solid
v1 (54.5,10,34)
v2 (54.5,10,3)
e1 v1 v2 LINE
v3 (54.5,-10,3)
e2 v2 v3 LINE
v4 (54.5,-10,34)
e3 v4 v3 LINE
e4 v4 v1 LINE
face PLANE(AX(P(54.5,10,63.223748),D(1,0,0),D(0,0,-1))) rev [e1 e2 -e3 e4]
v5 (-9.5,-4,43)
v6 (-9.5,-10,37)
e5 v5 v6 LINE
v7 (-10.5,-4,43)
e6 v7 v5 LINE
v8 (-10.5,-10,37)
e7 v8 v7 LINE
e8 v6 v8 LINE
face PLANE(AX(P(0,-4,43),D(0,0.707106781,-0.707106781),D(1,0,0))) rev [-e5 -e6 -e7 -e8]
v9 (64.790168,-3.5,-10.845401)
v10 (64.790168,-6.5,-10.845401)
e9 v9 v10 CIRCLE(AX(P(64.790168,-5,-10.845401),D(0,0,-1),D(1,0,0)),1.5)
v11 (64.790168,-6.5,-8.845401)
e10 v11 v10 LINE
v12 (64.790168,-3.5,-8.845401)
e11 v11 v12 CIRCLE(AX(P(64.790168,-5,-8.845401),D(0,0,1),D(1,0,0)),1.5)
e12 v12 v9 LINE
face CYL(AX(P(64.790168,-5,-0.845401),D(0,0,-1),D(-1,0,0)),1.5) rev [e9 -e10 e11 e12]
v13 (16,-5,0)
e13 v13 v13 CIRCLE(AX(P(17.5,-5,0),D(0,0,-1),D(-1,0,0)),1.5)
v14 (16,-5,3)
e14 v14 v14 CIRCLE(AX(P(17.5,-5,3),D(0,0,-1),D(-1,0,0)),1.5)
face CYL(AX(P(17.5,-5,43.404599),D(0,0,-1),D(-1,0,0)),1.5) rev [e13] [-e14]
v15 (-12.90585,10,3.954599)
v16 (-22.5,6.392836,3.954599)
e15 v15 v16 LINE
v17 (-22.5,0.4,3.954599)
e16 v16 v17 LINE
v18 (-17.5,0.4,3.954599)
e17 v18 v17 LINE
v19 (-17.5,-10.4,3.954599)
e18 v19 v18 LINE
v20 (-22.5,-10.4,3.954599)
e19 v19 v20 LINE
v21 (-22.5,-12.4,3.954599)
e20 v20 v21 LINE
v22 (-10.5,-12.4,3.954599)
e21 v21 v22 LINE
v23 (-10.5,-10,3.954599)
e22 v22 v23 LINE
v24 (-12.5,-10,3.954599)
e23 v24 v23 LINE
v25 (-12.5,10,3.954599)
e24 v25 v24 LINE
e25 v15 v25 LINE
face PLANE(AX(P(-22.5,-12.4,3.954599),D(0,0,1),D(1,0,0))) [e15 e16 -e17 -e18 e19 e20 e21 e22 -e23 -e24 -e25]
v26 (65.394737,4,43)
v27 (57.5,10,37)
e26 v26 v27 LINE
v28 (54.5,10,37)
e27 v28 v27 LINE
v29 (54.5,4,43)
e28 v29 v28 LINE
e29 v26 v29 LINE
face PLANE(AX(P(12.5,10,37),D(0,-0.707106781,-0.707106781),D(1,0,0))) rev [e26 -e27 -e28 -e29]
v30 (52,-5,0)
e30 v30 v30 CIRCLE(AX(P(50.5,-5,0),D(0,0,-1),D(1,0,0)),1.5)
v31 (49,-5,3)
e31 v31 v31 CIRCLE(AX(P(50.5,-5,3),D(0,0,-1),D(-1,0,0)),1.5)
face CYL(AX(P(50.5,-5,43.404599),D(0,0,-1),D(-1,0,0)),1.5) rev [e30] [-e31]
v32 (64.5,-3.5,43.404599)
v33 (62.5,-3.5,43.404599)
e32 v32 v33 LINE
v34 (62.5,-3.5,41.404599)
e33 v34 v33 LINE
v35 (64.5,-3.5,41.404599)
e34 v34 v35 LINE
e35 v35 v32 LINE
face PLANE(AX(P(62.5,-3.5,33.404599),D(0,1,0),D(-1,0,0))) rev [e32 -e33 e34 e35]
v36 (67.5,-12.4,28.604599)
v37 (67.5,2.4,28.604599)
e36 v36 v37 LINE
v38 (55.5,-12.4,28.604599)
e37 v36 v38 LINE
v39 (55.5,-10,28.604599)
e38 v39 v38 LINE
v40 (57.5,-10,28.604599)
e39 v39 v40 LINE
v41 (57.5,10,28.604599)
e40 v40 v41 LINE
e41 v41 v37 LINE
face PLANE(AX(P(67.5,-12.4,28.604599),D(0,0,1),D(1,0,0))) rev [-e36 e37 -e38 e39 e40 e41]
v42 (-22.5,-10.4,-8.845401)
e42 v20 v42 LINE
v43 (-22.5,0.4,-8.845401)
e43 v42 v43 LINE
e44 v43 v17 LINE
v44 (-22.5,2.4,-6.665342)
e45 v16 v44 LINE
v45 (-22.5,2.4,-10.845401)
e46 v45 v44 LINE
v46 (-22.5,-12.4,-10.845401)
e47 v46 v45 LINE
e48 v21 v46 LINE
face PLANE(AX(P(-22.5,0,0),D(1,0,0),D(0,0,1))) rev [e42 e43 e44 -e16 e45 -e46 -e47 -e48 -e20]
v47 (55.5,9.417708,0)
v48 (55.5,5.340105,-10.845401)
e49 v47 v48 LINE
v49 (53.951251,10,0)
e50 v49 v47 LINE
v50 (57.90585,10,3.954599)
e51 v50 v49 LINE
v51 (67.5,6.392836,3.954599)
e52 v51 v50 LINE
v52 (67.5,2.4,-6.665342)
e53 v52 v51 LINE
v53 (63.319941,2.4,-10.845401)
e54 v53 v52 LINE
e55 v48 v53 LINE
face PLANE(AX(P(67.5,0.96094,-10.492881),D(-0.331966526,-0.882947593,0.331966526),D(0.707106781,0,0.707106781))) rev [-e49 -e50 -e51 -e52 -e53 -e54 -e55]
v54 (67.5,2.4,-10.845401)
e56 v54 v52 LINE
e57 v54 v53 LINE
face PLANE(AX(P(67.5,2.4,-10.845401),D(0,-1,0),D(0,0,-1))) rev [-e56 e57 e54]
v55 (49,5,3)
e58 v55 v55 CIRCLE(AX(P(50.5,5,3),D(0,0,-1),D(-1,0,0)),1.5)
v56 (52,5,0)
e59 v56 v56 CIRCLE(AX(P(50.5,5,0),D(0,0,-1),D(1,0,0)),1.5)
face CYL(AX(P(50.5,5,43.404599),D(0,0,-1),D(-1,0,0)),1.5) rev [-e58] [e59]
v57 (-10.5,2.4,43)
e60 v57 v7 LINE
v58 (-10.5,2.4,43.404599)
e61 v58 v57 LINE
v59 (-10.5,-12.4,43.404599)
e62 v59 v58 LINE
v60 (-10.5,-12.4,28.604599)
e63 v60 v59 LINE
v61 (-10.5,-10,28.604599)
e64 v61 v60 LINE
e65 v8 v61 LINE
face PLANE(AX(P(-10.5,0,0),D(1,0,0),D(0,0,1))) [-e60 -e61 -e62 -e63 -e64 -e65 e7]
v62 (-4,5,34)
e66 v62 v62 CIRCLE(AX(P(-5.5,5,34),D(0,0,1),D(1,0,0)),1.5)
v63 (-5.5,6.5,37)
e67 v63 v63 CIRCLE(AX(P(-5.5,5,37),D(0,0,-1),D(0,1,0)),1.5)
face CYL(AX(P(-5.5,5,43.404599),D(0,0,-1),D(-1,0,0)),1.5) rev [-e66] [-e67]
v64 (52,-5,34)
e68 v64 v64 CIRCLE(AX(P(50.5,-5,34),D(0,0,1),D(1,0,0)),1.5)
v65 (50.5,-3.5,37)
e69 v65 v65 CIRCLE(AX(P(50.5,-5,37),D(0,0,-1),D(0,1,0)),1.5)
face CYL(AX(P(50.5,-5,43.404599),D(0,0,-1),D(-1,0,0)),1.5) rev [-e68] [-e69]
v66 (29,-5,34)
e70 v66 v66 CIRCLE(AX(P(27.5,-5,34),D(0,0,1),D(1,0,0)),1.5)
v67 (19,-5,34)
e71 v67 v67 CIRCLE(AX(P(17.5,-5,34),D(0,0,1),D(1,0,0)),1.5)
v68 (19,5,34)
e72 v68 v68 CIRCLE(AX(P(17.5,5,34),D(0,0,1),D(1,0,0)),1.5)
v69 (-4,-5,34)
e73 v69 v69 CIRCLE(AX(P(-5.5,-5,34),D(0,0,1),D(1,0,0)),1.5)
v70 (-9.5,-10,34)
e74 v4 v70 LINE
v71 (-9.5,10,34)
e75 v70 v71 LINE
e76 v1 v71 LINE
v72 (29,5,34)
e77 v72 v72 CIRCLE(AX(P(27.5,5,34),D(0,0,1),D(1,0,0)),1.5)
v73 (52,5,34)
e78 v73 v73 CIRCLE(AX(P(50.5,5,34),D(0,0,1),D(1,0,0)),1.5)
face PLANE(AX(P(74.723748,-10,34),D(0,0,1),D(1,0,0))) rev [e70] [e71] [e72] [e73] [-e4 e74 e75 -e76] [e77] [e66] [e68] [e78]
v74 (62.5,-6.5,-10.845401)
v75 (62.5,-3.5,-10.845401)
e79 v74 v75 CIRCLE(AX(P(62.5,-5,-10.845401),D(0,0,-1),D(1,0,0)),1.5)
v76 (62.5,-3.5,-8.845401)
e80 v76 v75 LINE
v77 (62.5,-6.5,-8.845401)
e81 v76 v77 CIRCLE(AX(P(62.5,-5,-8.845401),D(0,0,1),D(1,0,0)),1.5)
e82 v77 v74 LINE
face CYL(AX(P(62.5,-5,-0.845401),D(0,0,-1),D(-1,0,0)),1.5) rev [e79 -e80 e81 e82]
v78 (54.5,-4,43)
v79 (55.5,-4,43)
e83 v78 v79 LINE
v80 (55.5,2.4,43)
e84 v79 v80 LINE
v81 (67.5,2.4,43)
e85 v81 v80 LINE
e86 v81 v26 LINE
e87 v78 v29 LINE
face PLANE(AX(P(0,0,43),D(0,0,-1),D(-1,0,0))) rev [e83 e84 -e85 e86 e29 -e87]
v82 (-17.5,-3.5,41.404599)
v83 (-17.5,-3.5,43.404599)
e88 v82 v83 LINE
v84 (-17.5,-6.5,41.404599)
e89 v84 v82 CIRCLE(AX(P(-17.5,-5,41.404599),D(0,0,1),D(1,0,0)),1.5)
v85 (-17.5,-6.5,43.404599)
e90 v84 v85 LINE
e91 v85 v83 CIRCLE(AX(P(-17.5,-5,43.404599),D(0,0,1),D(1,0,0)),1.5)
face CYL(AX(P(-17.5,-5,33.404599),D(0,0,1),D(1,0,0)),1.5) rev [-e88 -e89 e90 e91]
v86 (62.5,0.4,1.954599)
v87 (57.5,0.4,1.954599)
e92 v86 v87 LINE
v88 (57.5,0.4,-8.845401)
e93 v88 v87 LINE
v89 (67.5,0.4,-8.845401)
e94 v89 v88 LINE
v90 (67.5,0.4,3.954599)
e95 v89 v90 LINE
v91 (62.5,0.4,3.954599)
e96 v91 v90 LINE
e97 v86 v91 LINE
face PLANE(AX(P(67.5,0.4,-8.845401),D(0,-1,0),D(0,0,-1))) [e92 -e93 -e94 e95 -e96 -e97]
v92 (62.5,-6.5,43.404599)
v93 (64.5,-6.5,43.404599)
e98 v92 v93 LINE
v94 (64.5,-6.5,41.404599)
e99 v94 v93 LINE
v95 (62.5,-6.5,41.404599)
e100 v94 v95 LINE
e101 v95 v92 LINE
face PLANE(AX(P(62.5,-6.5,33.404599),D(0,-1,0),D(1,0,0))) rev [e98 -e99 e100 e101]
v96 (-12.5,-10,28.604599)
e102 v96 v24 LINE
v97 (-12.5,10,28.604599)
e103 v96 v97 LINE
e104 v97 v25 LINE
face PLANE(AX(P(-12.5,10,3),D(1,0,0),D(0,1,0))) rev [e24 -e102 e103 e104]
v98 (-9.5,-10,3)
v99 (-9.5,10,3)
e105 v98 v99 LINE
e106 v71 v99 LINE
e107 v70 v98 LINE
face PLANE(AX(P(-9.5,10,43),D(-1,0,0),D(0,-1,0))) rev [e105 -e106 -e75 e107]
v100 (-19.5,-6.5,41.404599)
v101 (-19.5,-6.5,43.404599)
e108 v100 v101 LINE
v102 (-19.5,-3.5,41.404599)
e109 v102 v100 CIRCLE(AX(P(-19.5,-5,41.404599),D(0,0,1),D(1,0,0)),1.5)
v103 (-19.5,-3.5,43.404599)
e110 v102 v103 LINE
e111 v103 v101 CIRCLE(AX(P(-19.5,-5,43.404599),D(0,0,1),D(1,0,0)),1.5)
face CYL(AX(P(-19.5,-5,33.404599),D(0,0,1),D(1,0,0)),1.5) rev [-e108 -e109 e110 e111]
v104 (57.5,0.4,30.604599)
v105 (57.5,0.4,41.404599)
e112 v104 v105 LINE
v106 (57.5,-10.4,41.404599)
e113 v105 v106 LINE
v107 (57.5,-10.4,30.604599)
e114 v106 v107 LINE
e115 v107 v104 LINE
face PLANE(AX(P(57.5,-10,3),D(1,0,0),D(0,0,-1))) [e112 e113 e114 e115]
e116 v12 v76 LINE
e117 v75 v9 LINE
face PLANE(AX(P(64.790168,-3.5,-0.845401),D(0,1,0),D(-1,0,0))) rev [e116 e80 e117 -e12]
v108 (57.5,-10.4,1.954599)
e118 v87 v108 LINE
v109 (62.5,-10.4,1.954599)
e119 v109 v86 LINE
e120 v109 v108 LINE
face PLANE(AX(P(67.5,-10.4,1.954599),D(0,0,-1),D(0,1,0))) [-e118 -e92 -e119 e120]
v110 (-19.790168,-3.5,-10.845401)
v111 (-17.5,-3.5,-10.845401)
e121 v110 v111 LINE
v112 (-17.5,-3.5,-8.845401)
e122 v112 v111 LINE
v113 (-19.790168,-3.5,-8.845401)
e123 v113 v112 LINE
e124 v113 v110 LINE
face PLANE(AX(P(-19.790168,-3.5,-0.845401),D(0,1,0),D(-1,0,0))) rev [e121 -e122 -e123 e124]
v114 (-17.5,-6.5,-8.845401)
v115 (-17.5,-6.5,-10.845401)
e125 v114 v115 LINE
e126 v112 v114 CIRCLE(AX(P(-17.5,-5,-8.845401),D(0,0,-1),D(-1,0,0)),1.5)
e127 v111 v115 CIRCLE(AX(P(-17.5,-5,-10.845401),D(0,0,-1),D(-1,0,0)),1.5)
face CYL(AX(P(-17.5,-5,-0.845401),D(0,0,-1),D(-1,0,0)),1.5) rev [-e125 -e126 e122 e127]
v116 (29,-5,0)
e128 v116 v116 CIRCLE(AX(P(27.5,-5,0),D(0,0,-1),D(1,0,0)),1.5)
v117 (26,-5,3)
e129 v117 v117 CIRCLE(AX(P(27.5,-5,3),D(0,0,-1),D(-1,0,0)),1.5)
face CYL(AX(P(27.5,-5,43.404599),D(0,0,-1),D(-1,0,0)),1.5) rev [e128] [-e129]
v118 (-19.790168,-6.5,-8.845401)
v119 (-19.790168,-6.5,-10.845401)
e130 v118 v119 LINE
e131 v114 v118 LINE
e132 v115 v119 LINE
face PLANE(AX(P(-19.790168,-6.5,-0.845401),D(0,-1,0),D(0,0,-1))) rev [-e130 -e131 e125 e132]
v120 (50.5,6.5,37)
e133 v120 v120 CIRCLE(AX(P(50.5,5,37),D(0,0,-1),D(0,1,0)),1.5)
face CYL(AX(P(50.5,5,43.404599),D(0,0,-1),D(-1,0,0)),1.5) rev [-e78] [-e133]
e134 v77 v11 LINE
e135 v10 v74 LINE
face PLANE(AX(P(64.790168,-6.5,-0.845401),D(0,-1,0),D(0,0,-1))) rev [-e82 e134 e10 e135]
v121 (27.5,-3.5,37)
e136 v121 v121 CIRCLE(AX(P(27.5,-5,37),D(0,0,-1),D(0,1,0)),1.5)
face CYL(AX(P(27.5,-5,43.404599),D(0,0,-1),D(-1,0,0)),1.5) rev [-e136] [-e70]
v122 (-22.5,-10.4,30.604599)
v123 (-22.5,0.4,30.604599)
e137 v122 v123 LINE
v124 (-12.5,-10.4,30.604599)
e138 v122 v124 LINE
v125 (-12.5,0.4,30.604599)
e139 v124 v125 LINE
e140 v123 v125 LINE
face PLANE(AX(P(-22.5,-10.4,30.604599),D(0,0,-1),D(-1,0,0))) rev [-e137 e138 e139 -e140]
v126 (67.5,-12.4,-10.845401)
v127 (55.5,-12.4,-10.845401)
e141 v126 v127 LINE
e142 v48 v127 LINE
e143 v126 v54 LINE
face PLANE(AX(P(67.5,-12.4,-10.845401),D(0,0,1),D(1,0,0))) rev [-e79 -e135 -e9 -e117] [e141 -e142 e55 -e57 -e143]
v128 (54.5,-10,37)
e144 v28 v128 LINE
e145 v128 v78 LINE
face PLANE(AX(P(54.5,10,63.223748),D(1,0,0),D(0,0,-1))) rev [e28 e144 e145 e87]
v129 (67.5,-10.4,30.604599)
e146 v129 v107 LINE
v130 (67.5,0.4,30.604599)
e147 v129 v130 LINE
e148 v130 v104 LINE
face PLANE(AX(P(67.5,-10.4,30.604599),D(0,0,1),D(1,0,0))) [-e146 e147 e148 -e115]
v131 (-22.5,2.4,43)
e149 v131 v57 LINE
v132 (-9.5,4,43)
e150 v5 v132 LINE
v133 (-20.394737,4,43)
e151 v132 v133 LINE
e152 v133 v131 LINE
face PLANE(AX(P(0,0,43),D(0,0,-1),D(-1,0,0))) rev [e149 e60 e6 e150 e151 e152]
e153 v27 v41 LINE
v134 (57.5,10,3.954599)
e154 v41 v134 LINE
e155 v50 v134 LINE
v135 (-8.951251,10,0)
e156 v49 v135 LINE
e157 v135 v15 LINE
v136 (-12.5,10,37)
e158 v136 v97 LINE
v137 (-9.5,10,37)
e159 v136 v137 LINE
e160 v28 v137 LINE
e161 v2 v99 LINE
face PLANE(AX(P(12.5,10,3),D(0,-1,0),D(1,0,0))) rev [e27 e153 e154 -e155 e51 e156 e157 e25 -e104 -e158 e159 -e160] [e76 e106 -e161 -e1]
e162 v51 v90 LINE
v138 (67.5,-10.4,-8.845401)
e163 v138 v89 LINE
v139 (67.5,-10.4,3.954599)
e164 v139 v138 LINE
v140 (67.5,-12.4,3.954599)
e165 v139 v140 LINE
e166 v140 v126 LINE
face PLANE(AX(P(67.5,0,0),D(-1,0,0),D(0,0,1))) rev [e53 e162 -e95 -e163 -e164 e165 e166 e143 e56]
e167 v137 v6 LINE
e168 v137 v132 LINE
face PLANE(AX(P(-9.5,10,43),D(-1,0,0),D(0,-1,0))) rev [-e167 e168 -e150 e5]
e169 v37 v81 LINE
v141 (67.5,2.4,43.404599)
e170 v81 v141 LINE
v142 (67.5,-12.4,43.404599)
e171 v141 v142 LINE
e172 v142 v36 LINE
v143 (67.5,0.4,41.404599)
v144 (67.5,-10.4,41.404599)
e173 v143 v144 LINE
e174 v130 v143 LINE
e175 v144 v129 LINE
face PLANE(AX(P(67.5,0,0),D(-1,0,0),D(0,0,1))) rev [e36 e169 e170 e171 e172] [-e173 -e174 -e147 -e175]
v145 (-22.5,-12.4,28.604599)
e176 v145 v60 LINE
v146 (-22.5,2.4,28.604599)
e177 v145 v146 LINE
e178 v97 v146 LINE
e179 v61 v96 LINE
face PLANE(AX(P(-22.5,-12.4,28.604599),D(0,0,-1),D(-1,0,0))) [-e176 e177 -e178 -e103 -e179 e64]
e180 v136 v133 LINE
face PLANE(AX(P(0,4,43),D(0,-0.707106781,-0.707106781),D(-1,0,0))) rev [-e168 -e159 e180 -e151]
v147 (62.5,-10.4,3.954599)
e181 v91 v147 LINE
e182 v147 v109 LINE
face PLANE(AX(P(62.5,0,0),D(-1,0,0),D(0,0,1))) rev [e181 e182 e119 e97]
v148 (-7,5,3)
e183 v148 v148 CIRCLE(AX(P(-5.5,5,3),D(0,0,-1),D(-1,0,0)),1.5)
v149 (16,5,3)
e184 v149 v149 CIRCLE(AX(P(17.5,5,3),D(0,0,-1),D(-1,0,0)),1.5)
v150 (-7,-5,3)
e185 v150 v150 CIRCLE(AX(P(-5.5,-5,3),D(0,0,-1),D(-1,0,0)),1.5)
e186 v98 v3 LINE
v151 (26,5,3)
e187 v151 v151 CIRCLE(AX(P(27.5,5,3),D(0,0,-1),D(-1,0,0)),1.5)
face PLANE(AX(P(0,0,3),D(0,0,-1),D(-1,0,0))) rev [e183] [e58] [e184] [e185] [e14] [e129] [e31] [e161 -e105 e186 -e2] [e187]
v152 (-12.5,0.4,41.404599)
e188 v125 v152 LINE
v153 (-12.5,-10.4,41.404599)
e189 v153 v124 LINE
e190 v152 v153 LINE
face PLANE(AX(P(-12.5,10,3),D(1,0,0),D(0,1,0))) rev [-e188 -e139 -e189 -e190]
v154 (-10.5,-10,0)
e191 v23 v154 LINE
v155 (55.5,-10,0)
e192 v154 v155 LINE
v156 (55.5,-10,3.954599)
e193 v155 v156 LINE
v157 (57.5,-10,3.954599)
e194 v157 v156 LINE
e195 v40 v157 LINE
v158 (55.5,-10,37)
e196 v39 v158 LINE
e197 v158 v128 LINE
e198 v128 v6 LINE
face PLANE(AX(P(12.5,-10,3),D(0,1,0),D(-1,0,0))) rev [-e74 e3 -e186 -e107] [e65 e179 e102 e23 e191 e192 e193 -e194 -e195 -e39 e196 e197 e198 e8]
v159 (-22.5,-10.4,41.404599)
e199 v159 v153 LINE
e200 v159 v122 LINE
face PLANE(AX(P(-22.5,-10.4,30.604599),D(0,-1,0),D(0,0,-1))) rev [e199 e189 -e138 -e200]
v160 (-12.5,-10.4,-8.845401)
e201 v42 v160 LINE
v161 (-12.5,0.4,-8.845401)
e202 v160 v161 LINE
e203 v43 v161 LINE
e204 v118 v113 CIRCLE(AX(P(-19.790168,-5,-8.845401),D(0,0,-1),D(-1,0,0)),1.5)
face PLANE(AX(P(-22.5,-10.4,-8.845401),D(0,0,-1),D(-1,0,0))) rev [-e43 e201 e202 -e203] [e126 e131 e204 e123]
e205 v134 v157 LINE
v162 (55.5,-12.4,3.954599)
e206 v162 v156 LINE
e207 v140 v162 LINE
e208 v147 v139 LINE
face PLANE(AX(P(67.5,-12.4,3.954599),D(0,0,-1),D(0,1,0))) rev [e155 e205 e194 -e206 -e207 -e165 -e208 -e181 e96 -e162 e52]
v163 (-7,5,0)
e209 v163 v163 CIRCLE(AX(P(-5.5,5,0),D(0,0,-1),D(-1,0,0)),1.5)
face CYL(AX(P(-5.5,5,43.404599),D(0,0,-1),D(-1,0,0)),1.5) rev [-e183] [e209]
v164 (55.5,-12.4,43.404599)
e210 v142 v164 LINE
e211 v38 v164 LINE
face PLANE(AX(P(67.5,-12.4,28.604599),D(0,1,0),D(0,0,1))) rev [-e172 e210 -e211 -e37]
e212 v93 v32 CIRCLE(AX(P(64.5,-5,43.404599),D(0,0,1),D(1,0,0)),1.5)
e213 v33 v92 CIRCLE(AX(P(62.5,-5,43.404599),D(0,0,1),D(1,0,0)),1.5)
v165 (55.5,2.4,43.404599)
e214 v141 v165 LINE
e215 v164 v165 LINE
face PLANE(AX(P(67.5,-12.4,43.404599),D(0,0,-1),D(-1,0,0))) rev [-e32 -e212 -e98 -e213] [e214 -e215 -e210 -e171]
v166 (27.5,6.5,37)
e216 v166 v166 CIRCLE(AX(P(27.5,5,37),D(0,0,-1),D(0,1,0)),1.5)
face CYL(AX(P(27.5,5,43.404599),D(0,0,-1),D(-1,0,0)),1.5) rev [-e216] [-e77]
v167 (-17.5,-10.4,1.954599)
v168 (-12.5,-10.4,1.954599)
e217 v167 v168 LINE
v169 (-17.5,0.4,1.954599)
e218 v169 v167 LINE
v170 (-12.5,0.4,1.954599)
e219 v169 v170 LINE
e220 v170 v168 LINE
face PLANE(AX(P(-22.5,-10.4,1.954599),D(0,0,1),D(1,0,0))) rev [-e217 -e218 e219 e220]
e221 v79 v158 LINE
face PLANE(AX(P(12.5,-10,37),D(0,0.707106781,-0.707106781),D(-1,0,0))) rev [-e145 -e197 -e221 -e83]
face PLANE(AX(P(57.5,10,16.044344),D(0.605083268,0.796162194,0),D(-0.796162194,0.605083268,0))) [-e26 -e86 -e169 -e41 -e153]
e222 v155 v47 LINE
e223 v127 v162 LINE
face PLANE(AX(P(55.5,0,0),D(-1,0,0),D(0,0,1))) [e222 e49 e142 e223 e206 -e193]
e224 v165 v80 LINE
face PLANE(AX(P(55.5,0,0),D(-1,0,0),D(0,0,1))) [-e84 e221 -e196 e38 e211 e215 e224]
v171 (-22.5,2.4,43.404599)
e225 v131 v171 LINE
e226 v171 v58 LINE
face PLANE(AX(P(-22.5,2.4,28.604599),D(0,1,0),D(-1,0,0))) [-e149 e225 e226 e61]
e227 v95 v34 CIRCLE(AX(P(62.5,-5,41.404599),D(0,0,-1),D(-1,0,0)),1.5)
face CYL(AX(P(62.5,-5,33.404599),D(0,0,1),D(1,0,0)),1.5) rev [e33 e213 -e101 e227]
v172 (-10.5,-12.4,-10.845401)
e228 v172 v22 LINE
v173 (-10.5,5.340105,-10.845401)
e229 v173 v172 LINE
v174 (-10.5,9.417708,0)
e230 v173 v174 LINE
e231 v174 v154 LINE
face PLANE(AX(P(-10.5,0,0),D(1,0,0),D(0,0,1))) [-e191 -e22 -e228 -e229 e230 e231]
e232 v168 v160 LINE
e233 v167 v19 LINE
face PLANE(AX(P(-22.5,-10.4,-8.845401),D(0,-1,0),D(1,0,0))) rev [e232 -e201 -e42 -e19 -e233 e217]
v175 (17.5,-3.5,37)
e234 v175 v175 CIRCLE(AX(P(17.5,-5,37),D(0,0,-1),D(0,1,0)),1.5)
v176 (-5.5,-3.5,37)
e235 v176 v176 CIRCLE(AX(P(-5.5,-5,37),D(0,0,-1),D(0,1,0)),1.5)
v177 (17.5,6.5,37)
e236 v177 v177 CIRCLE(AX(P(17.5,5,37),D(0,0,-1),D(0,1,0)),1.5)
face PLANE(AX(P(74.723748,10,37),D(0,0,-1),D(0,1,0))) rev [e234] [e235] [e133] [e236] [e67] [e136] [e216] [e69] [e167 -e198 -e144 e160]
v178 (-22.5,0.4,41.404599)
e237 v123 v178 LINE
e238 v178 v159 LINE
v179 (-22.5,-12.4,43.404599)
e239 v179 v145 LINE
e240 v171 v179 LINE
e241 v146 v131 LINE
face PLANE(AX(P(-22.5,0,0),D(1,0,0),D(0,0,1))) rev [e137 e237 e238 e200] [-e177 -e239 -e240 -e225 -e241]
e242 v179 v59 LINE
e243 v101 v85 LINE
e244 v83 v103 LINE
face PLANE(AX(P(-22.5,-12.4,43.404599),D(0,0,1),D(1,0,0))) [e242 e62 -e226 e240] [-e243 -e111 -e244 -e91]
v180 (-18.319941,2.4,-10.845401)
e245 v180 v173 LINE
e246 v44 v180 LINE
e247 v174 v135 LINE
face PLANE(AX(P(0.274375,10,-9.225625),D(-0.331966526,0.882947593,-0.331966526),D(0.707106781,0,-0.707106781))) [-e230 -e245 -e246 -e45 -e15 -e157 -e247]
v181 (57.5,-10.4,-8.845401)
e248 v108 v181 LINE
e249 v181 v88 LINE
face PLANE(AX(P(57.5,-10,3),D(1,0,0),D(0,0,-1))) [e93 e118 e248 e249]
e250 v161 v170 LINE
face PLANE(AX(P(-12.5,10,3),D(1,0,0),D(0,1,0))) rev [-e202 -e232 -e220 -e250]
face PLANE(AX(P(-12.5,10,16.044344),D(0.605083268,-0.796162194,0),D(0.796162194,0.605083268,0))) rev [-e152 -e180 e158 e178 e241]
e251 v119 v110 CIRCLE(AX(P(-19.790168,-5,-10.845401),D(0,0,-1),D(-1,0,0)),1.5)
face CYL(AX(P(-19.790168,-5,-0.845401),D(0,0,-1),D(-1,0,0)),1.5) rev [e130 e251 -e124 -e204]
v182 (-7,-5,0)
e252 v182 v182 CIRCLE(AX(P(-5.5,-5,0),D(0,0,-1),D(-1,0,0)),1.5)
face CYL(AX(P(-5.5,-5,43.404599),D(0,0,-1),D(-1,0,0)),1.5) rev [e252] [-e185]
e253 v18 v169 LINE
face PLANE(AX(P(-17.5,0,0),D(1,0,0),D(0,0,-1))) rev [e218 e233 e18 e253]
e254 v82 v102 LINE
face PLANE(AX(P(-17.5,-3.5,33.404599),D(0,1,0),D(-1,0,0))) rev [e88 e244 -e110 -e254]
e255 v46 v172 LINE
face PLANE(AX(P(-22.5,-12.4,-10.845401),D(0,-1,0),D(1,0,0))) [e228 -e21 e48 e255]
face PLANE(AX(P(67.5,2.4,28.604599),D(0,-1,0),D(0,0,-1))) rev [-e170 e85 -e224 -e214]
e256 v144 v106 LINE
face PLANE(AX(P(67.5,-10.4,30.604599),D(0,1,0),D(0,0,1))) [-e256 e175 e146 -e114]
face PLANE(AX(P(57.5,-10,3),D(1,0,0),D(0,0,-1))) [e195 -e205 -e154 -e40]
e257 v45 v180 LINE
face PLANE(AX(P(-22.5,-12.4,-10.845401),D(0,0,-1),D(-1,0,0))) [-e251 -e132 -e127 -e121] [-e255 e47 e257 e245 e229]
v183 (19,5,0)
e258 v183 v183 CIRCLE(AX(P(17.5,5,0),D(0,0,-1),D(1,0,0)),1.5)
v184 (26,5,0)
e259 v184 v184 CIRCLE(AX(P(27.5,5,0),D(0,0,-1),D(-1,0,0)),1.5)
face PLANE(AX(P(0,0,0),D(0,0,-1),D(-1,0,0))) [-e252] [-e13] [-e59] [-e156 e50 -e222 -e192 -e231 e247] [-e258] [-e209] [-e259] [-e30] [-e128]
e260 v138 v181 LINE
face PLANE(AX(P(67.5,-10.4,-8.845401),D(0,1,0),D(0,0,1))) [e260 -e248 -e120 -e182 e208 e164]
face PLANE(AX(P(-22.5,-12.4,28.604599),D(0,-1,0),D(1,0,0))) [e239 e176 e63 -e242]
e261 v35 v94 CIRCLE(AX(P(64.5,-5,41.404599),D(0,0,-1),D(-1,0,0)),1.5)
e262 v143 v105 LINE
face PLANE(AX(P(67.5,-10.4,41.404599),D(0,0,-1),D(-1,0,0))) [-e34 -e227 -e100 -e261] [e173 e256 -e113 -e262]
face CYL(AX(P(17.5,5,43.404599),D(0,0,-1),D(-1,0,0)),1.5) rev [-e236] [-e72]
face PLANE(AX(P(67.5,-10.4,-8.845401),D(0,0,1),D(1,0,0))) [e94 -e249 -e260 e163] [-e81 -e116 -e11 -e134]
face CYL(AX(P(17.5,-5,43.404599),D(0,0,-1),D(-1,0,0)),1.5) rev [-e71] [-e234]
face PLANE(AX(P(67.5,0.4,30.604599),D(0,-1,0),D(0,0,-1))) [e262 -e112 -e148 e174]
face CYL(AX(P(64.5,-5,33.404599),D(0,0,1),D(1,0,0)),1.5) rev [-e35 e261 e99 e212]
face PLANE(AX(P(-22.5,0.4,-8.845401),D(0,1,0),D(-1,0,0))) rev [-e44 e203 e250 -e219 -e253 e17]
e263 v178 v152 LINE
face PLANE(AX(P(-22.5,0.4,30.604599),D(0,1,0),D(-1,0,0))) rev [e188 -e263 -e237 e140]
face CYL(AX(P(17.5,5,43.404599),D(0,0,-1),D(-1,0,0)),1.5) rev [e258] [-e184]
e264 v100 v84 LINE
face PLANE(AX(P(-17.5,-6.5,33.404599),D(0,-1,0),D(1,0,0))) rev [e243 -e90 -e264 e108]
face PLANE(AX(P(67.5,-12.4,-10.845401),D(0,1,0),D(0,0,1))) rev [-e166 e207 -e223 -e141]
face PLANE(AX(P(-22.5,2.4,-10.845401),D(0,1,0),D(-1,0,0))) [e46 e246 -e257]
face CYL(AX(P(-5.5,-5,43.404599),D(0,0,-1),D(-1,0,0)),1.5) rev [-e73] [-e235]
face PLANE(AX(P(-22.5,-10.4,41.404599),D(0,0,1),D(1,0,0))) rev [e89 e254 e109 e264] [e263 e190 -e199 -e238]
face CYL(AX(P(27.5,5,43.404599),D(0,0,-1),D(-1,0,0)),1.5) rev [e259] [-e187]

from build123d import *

# Parameters (mm, degrees)
SKETCH1_W            = 25
SKETCH1_H            = 20
BOSS_EXTRUDE1_DEPTH  = 3
SKETCH2_W            = 3
SKETCH2_H            = 20
BOSS_EXTRUDE2_DEPTH  = 40
SKETCH6_W            = 45
SKETCH6_H            = 20
BOSS_EXTRUDE3_DEPTH  = 3
SKETCH9_W            = 3
SKETCH9_H            = 20
BOSS_EXTRUDE4_DEPTH  = 40
CHAMFER1_SIZE        = 6
SKETCH17_W           = 14.8
SKETCH17_H           = 14.8
SKETCH17_W_2         = 10.8
SKETCH17_H_2         = 10.8
BOSS_EXTRUDE7_DEPTH  = 10
SKETCH18_W           = 14.8
SKETCH18_H           = 14.8
BOSS_EXTRUDE8_DEPTH  = 2
SKETCH21_W           = 14.8
SKETCH21_H           = 14.8
BOSS_EXTRUDE11_DEPTH = 2
BOSS_EXTRUDE12_REACH = 89.482
BOSS_EXTRUDE13_DEPTH = 7.6
CHAMFER4_SIZE        = 17
CHAMFER4_SIZE_2      = 9.039060338
CUT_EXTRUDE8_DEPTH   = 13
SKETCH27_W           = 2
SKETCH27_H           = 10.8
CUT_EXTRUDE10_DEPTH  = 3
CUT_EXTRUDE12_DEPTH  = 10
CUT_EXTRUDE13_START  = -10
CUT_EXTRUDE13_DEPTH  = 10
SKETCH40_W           = 2
SKETCH40_H           = 10.8
CUT_EXTRUDE16_DEPTH  = 2
SKETCH41_W           = 2
SKETCH41_H           = 10.8
CUT_EXTRUDE17_DEPTH  = 2
SKETCH51_W           = 3
SKETCH51_H           = 20
BOSS_EXTRUDE14_DEPTH = 64
SKETCH50_R           = 1.5
CUT_EXTRUDE22_DEPTH  = 82.203258526


# Read off the part's stored shape, not the designer's step: Mirror3
with BuildPart() as part:
    # Sketch1 → Boss-Extrude1 (new body)
    with BuildSketch(Plane.XY):
        Rectangle(SKETCH1_W, SKETCH1_H)
    extrude(amount=BOSS_EXTRUDE1_DEPTH)

    # Sketch2 → Boss-Extrude2 (add)
    with BuildSketch(Plane.XY.offset(3)):
        with Locations((-11, 0)):
            Rectangle(SKETCH2_W, SKETCH2_H)
    extrude(amount=BOSS_EXTRUDE2_DEPTH)

    # Sketch6 → Boss-Extrude3 (add)
    with BuildSketch(Plane(origin=(0, 0, 0), x_dir=(-1, 0, 0), z_dir=(0, 0, -1))):
        with Locations((-35, 0)):
            Rectangle(SKETCH6_W, SKETCH6_H)
    extrude(amount=-BOSS_EXTRUDE3_DEPTH)

    # Sketch9 → Boss-Extrude4 (add)
    with BuildSketch(Plane.XY.offset(3)):
        with Locations((56, 0)):
            Rectangle(SKETCH9_W, SKETCH9_H)
    extrude(amount=BOSS_EXTRUDE4_DEPTH)

    # Chamfer1
    chamfer1_edges = [part.edges().sort_by_distance(p)[0] for p in [
        (-11, -10, 43),
        (-11, 10, 43),
        (56, -10, 43),
        (56, 10, 43),
    ]]
    chamfer(chamfer1_edges, length=CHAMFER1_SIZE)

    # Sketch17 → Boss-Extrude7 (add)
    # profile 1 of 2: a face of its own
    with BuildSketch(Plane(origin=(57.5, 0, 0), x_dir=(0, 0, -1), z_dir=(1, 0, 0))):
        with Locations((3.445401219, -5)):
            Rectangle(SKETCH17_W, SKETCH17_H)
        with Locations((3.445401219, -5)):
            Rectangle(SKETCH17_W_2, SKETCH17_H_2, mode=Mode.SUBTRACT)
    # profile 2 of 2: a face of its own
    with BuildSketch(Plane(origin=(57.5, 0, 0), x_dir=(0, 0, -1), z_dir=(1, 0, 0))):
        with Locations((-36.004598781, -5)):
            Rectangle(SKETCH17_W, SKETCH17_H)
        with Locations((-36.004598781, -5)):
            Rectangle(SKETCH17_W_2, SKETCH17_H_2, mode=Mode.SUBTRACT)
    extrude(amount=BOSS_EXTRUDE7_DEPTH)

    # Sketch18 → Boss-Extrude8 (add)
    with BuildSketch(Plane.ZY.offset(-57.5)):
        with Locations((-3.445401219, -5)):
            Rectangle(SKETCH18_W, SKETCH18_H)
    extrude(amount=BOSS_EXTRUDE8_DEPTH)

    # Sketch21 → Boss-Extrude11 (add)
    with BuildSketch(Plane.ZY.offset(-57.5)):
        with Locations((36.004598781, -5)):
            Rectangle(SKETCH21_W, SKETCH21_H)
    extrude(amount=BOSS_EXTRUDE11_DEPTH)

    # Boss-Extrude12: up to this face of the body (flat: up to its plane)
    boss_extrude12_end = Plane(part.part.faces().sort_by_distance((62.311518325, -5.194764398, 28.604598781))[0])
    # Sketch22 → Boss-Extrude12 (add, up to the picked face)
    with BuildSketch(Plane.XY.offset(43.404598781), mode=Mode.PRIVATE) as boss_extrude12_sk1:
        Polygon((57.5, 2.4), (57.5, 10), (67.5, 2.4), align=None)
    boss_extrude12_tool1 = split(extrude(boss_extrude12_sk1.sketch, amount=-BOSS_EXTRUDE12_REACH, mode=Mode.PRIVATE), bisect_by=boss_extrude12_end, keep=Keep.BOTH, mode=Mode.PRIVATE)
    add(boss_extrude12_tool1.solids().sort_by(Axis((60.833333, 4.933333, 43.404599), (0, 0, -1)))[0])

    # Sketch23 → Boss-Extrude13 (add)
    with BuildSketch(Plane(origin=(0, 2.4, 0), x_dir=(1, 0, 0), z_dir=(0, 1, 0))):
        Polygon((55.5, 0), (57.5, 0), (57.5, -3.954598781), (67.5, -3.954598781), (67.5, 10.492881323), (67.147480104, 10.845401219), (55.5, 10.845401219), align=None)
    extrude(amount=BOSS_EXTRUDE13_DEPTH)

    # Chamfer4
    # the kernel refuses this chamfer: 17, 9.039060338 mm, written as the material it adds along each edge
    # the kernel refuses this chamfer: 17, 9.039060338 mm, written as the material it takes off along each edge
    with BuildSketch(Plane(origin=(98.618530871, 10, 20.625649548), x_dir=(-0.7069904920950609, 0.018135274312576832, 0.706990492095043), z_dir=(-0.7071067811865386, 0, -0.7071067811865565))) as chamfer4_2_piece_1_section:
        Polygon((CHAMFER4_SIZE * 0.99983554239, -CHAMFER4_SIZE * 0.0181352743126), (-CHAMFER4_SIZE_2 * 0.0181352743131, -CHAMFER4_SIZE_2 * 0.999835542417), (0, 0), align=None)
    chamfer4_2_piece_1 = extrude(amount=88.515035216, mode=Mode.PRIVATE)
    chamfer4_2_piece_1 = split(chamfer4_2_piece_1, bisect_by=Plane(origin=(63.588119048, 2.4, 1.757393484), z_dir=(0, 1, 0)), keep=Keep.TOP, mode=Mode.PRIVATE)
    add(chamfer4_2_piece_1, mode=Mode.SUBTRACT)

    # Sketch24 → Cut-Extrude8 (cut)
    with BuildSketch(Plane.ZY.offset(-57.5)):
        Polygon((37, 10), (43.404598781, 10), (43.404598781, 2.4), (43, 2.4), (43, 4), align=None)
    extrude(amount=-CUT_EXTRUDE8_DEPTH, mode=Mode.SUBTRACT)

    # Mirror3
    split(bisect_by=Plane.ZY.offset(-22.5), keep=Keep.BOTTOM)

    # Mirror3 2: part across plane


with BuildPart() as part_1:
    add(part.part)
    add(part.part.mirror(Plane.ZY.offset(-22.5)))

    # Sketch27 → Cut-Extrude10 (cut)
    with BuildSketch(Plane.ZY.offset(22.5)):
        with Locations((2.954598781, -5)):
            Rectangle(SKETCH27_W, SKETCH27_H)
    cut_extrude10 = extrude(amount=-CUT_EXTRUDE10_DEPTH, mode=Mode.SUBTRACT)

    # Mirror4: Cut-Extrude10 across plane
    add(cut_extrude10.mirror(Plane.ZY.offset(-22.5)), mode=Mode.SUBTRACT)

    # Sketch32 → Cut-Extrude12 (cut)
    with BuildSketch(Plane(origin=(0, 0, -10.845401219), x_dir=(-1, 0, 0), z_dir=(0, 0, -1))):
        with BuildLine():
            Line((19.790168373, -6.5), (17.5, -6.5))
            ThreePointArc((17.5, -6.5), (16, -5), (17.5, -3.5))
            Line((17.5, -3.5), (19.790168373, -3.5))
            ThreePointArc((19.790168373, -3.5), (21.290168373, -5), (19.790168373, -6.5))
        make_face()
        with BuildLine():
            Line((-64.790168373, -6.5), (-62.5, -6.5))
            ThreePointArc((-62.5, -6.5), (-61, -5), (-62.5, -3.5))
            Line((-62.5, -3.5), (-64.790168373, -3.5))
            ThreePointArc((-64.790168373, -3.5), (-66.290168373, -5), (-64.790168373, -6.5))
        make_face()
    extrude(amount=-CUT_EXTRUDE12_DEPTH, mode=Mode.SUBTRACT)

    # Sketch33 → Cut-Extrude13 (cut)
    with BuildSketch(Plane.XY.offset(43.404598781).offset(CUT_EXTRUDE13_START)):
        with BuildLine():
            Line((62.5, -3.5), (64.5, -3.5))
            ThreePointArc((64.5, -3.5), (66, -5), (64.5, -6.5))
            Line((64.5, -6.5), (62.5, -6.5))
            ThreePointArc((62.5, -6.5), (61, -5), (62.5, -3.5))
        make_face()
        with BuildLine():
            Line((-17.5, -6.5), (-19.5, -6.5))
            ThreePointArc((-19.5, -6.5), (-21, -5), (-19.5, -3.5))
            Line((-19.5, -3.5), (-17.5, -3.5))
            ThreePointArc((-17.5, -3.5), (-16, -5), (-17.5, -6.5))
        make_face()
    extrude(amount=CUT_EXTRUDE13_DEPTH, mode=Mode.SUBTRACT)

    # Sketch40 → Cut-Extrude16 (cut)
    with BuildSketch(Plane(origin=(64.5, 0, 0), x_dir=(0, 0, -1), z_dir=(1, 0, 0))):
        with Locations((-2.954598781, -5)):
            Rectangle(SKETCH40_W, SKETCH40_H)
    extrude(amount=-CUT_EXTRUDE16_DEPTH, mode=Mode.SUBTRACT)

    # Sketch41 → Cut-Extrude17 (cut)
    with BuildSketch(Plane.ZY.offset(19.5)):
        with Locations((2.954598781, -5)):
            Rectangle(SKETCH41_W, SKETCH41_H)
    extrude(amount=-CUT_EXTRUDE17_DEPTH, mode=Mode.SUBTRACT)

    # Sketch51 → Boss-Extrude14 (add)
    with BuildSketch(Plane(origin=(-9.5, 0, 0), x_dir=(0, 0, -1), z_dir=(1, 0, 0))):
        with Locations((-35.5, 0)):
            Rectangle(SKETCH51_W, SKETCH51_H)
    extrude(amount=BOSS_EXTRUDE14_DEPTH)

    # Sketch50 → Cut-Extrude22 (cut, through all)
    with BuildSketch(Plane(origin=(0, 0, 0), x_dir=(-1, 0, 0), z_dir=(0, 0, -1))):
        with Locations(Location((5.5, 5, 0), (0, 0, 90))):
            Circle(SKETCH50_R)
        with Locations(Location((5.5, -5, 0), (0, 0, 90))):
            Circle(SKETCH50_R)
        with Locations(Location((-50.5, -5, 0), (0, 0, 90))):
            Circle(SKETCH50_R)
        with Locations(Location((-50.5, 5, 0), (0, 0, 90))):
            Circle(SKETCH50_R)
        with Locations(Location((-27.5, 5, 0), (0, 0, 90))):
            Circle(SKETCH50_R)
        with Locations(Location((-27.5, -5, 0), (0, 0, 90))):
            Circle(SKETCH50_R)
        with Locations(Location((-17.5, -5, 0), (0, 0, 90))):
            Circle(SKETCH50_R)
        with Locations(Location((-17.5, 5, 0), (0, 0, 90))):
            Circle(SKETCH50_R)
    extrude(amount=-CUT_EXTRUDE22_DEPTH, mode=Mode.SUBTRACT)


solid = part_1.part
